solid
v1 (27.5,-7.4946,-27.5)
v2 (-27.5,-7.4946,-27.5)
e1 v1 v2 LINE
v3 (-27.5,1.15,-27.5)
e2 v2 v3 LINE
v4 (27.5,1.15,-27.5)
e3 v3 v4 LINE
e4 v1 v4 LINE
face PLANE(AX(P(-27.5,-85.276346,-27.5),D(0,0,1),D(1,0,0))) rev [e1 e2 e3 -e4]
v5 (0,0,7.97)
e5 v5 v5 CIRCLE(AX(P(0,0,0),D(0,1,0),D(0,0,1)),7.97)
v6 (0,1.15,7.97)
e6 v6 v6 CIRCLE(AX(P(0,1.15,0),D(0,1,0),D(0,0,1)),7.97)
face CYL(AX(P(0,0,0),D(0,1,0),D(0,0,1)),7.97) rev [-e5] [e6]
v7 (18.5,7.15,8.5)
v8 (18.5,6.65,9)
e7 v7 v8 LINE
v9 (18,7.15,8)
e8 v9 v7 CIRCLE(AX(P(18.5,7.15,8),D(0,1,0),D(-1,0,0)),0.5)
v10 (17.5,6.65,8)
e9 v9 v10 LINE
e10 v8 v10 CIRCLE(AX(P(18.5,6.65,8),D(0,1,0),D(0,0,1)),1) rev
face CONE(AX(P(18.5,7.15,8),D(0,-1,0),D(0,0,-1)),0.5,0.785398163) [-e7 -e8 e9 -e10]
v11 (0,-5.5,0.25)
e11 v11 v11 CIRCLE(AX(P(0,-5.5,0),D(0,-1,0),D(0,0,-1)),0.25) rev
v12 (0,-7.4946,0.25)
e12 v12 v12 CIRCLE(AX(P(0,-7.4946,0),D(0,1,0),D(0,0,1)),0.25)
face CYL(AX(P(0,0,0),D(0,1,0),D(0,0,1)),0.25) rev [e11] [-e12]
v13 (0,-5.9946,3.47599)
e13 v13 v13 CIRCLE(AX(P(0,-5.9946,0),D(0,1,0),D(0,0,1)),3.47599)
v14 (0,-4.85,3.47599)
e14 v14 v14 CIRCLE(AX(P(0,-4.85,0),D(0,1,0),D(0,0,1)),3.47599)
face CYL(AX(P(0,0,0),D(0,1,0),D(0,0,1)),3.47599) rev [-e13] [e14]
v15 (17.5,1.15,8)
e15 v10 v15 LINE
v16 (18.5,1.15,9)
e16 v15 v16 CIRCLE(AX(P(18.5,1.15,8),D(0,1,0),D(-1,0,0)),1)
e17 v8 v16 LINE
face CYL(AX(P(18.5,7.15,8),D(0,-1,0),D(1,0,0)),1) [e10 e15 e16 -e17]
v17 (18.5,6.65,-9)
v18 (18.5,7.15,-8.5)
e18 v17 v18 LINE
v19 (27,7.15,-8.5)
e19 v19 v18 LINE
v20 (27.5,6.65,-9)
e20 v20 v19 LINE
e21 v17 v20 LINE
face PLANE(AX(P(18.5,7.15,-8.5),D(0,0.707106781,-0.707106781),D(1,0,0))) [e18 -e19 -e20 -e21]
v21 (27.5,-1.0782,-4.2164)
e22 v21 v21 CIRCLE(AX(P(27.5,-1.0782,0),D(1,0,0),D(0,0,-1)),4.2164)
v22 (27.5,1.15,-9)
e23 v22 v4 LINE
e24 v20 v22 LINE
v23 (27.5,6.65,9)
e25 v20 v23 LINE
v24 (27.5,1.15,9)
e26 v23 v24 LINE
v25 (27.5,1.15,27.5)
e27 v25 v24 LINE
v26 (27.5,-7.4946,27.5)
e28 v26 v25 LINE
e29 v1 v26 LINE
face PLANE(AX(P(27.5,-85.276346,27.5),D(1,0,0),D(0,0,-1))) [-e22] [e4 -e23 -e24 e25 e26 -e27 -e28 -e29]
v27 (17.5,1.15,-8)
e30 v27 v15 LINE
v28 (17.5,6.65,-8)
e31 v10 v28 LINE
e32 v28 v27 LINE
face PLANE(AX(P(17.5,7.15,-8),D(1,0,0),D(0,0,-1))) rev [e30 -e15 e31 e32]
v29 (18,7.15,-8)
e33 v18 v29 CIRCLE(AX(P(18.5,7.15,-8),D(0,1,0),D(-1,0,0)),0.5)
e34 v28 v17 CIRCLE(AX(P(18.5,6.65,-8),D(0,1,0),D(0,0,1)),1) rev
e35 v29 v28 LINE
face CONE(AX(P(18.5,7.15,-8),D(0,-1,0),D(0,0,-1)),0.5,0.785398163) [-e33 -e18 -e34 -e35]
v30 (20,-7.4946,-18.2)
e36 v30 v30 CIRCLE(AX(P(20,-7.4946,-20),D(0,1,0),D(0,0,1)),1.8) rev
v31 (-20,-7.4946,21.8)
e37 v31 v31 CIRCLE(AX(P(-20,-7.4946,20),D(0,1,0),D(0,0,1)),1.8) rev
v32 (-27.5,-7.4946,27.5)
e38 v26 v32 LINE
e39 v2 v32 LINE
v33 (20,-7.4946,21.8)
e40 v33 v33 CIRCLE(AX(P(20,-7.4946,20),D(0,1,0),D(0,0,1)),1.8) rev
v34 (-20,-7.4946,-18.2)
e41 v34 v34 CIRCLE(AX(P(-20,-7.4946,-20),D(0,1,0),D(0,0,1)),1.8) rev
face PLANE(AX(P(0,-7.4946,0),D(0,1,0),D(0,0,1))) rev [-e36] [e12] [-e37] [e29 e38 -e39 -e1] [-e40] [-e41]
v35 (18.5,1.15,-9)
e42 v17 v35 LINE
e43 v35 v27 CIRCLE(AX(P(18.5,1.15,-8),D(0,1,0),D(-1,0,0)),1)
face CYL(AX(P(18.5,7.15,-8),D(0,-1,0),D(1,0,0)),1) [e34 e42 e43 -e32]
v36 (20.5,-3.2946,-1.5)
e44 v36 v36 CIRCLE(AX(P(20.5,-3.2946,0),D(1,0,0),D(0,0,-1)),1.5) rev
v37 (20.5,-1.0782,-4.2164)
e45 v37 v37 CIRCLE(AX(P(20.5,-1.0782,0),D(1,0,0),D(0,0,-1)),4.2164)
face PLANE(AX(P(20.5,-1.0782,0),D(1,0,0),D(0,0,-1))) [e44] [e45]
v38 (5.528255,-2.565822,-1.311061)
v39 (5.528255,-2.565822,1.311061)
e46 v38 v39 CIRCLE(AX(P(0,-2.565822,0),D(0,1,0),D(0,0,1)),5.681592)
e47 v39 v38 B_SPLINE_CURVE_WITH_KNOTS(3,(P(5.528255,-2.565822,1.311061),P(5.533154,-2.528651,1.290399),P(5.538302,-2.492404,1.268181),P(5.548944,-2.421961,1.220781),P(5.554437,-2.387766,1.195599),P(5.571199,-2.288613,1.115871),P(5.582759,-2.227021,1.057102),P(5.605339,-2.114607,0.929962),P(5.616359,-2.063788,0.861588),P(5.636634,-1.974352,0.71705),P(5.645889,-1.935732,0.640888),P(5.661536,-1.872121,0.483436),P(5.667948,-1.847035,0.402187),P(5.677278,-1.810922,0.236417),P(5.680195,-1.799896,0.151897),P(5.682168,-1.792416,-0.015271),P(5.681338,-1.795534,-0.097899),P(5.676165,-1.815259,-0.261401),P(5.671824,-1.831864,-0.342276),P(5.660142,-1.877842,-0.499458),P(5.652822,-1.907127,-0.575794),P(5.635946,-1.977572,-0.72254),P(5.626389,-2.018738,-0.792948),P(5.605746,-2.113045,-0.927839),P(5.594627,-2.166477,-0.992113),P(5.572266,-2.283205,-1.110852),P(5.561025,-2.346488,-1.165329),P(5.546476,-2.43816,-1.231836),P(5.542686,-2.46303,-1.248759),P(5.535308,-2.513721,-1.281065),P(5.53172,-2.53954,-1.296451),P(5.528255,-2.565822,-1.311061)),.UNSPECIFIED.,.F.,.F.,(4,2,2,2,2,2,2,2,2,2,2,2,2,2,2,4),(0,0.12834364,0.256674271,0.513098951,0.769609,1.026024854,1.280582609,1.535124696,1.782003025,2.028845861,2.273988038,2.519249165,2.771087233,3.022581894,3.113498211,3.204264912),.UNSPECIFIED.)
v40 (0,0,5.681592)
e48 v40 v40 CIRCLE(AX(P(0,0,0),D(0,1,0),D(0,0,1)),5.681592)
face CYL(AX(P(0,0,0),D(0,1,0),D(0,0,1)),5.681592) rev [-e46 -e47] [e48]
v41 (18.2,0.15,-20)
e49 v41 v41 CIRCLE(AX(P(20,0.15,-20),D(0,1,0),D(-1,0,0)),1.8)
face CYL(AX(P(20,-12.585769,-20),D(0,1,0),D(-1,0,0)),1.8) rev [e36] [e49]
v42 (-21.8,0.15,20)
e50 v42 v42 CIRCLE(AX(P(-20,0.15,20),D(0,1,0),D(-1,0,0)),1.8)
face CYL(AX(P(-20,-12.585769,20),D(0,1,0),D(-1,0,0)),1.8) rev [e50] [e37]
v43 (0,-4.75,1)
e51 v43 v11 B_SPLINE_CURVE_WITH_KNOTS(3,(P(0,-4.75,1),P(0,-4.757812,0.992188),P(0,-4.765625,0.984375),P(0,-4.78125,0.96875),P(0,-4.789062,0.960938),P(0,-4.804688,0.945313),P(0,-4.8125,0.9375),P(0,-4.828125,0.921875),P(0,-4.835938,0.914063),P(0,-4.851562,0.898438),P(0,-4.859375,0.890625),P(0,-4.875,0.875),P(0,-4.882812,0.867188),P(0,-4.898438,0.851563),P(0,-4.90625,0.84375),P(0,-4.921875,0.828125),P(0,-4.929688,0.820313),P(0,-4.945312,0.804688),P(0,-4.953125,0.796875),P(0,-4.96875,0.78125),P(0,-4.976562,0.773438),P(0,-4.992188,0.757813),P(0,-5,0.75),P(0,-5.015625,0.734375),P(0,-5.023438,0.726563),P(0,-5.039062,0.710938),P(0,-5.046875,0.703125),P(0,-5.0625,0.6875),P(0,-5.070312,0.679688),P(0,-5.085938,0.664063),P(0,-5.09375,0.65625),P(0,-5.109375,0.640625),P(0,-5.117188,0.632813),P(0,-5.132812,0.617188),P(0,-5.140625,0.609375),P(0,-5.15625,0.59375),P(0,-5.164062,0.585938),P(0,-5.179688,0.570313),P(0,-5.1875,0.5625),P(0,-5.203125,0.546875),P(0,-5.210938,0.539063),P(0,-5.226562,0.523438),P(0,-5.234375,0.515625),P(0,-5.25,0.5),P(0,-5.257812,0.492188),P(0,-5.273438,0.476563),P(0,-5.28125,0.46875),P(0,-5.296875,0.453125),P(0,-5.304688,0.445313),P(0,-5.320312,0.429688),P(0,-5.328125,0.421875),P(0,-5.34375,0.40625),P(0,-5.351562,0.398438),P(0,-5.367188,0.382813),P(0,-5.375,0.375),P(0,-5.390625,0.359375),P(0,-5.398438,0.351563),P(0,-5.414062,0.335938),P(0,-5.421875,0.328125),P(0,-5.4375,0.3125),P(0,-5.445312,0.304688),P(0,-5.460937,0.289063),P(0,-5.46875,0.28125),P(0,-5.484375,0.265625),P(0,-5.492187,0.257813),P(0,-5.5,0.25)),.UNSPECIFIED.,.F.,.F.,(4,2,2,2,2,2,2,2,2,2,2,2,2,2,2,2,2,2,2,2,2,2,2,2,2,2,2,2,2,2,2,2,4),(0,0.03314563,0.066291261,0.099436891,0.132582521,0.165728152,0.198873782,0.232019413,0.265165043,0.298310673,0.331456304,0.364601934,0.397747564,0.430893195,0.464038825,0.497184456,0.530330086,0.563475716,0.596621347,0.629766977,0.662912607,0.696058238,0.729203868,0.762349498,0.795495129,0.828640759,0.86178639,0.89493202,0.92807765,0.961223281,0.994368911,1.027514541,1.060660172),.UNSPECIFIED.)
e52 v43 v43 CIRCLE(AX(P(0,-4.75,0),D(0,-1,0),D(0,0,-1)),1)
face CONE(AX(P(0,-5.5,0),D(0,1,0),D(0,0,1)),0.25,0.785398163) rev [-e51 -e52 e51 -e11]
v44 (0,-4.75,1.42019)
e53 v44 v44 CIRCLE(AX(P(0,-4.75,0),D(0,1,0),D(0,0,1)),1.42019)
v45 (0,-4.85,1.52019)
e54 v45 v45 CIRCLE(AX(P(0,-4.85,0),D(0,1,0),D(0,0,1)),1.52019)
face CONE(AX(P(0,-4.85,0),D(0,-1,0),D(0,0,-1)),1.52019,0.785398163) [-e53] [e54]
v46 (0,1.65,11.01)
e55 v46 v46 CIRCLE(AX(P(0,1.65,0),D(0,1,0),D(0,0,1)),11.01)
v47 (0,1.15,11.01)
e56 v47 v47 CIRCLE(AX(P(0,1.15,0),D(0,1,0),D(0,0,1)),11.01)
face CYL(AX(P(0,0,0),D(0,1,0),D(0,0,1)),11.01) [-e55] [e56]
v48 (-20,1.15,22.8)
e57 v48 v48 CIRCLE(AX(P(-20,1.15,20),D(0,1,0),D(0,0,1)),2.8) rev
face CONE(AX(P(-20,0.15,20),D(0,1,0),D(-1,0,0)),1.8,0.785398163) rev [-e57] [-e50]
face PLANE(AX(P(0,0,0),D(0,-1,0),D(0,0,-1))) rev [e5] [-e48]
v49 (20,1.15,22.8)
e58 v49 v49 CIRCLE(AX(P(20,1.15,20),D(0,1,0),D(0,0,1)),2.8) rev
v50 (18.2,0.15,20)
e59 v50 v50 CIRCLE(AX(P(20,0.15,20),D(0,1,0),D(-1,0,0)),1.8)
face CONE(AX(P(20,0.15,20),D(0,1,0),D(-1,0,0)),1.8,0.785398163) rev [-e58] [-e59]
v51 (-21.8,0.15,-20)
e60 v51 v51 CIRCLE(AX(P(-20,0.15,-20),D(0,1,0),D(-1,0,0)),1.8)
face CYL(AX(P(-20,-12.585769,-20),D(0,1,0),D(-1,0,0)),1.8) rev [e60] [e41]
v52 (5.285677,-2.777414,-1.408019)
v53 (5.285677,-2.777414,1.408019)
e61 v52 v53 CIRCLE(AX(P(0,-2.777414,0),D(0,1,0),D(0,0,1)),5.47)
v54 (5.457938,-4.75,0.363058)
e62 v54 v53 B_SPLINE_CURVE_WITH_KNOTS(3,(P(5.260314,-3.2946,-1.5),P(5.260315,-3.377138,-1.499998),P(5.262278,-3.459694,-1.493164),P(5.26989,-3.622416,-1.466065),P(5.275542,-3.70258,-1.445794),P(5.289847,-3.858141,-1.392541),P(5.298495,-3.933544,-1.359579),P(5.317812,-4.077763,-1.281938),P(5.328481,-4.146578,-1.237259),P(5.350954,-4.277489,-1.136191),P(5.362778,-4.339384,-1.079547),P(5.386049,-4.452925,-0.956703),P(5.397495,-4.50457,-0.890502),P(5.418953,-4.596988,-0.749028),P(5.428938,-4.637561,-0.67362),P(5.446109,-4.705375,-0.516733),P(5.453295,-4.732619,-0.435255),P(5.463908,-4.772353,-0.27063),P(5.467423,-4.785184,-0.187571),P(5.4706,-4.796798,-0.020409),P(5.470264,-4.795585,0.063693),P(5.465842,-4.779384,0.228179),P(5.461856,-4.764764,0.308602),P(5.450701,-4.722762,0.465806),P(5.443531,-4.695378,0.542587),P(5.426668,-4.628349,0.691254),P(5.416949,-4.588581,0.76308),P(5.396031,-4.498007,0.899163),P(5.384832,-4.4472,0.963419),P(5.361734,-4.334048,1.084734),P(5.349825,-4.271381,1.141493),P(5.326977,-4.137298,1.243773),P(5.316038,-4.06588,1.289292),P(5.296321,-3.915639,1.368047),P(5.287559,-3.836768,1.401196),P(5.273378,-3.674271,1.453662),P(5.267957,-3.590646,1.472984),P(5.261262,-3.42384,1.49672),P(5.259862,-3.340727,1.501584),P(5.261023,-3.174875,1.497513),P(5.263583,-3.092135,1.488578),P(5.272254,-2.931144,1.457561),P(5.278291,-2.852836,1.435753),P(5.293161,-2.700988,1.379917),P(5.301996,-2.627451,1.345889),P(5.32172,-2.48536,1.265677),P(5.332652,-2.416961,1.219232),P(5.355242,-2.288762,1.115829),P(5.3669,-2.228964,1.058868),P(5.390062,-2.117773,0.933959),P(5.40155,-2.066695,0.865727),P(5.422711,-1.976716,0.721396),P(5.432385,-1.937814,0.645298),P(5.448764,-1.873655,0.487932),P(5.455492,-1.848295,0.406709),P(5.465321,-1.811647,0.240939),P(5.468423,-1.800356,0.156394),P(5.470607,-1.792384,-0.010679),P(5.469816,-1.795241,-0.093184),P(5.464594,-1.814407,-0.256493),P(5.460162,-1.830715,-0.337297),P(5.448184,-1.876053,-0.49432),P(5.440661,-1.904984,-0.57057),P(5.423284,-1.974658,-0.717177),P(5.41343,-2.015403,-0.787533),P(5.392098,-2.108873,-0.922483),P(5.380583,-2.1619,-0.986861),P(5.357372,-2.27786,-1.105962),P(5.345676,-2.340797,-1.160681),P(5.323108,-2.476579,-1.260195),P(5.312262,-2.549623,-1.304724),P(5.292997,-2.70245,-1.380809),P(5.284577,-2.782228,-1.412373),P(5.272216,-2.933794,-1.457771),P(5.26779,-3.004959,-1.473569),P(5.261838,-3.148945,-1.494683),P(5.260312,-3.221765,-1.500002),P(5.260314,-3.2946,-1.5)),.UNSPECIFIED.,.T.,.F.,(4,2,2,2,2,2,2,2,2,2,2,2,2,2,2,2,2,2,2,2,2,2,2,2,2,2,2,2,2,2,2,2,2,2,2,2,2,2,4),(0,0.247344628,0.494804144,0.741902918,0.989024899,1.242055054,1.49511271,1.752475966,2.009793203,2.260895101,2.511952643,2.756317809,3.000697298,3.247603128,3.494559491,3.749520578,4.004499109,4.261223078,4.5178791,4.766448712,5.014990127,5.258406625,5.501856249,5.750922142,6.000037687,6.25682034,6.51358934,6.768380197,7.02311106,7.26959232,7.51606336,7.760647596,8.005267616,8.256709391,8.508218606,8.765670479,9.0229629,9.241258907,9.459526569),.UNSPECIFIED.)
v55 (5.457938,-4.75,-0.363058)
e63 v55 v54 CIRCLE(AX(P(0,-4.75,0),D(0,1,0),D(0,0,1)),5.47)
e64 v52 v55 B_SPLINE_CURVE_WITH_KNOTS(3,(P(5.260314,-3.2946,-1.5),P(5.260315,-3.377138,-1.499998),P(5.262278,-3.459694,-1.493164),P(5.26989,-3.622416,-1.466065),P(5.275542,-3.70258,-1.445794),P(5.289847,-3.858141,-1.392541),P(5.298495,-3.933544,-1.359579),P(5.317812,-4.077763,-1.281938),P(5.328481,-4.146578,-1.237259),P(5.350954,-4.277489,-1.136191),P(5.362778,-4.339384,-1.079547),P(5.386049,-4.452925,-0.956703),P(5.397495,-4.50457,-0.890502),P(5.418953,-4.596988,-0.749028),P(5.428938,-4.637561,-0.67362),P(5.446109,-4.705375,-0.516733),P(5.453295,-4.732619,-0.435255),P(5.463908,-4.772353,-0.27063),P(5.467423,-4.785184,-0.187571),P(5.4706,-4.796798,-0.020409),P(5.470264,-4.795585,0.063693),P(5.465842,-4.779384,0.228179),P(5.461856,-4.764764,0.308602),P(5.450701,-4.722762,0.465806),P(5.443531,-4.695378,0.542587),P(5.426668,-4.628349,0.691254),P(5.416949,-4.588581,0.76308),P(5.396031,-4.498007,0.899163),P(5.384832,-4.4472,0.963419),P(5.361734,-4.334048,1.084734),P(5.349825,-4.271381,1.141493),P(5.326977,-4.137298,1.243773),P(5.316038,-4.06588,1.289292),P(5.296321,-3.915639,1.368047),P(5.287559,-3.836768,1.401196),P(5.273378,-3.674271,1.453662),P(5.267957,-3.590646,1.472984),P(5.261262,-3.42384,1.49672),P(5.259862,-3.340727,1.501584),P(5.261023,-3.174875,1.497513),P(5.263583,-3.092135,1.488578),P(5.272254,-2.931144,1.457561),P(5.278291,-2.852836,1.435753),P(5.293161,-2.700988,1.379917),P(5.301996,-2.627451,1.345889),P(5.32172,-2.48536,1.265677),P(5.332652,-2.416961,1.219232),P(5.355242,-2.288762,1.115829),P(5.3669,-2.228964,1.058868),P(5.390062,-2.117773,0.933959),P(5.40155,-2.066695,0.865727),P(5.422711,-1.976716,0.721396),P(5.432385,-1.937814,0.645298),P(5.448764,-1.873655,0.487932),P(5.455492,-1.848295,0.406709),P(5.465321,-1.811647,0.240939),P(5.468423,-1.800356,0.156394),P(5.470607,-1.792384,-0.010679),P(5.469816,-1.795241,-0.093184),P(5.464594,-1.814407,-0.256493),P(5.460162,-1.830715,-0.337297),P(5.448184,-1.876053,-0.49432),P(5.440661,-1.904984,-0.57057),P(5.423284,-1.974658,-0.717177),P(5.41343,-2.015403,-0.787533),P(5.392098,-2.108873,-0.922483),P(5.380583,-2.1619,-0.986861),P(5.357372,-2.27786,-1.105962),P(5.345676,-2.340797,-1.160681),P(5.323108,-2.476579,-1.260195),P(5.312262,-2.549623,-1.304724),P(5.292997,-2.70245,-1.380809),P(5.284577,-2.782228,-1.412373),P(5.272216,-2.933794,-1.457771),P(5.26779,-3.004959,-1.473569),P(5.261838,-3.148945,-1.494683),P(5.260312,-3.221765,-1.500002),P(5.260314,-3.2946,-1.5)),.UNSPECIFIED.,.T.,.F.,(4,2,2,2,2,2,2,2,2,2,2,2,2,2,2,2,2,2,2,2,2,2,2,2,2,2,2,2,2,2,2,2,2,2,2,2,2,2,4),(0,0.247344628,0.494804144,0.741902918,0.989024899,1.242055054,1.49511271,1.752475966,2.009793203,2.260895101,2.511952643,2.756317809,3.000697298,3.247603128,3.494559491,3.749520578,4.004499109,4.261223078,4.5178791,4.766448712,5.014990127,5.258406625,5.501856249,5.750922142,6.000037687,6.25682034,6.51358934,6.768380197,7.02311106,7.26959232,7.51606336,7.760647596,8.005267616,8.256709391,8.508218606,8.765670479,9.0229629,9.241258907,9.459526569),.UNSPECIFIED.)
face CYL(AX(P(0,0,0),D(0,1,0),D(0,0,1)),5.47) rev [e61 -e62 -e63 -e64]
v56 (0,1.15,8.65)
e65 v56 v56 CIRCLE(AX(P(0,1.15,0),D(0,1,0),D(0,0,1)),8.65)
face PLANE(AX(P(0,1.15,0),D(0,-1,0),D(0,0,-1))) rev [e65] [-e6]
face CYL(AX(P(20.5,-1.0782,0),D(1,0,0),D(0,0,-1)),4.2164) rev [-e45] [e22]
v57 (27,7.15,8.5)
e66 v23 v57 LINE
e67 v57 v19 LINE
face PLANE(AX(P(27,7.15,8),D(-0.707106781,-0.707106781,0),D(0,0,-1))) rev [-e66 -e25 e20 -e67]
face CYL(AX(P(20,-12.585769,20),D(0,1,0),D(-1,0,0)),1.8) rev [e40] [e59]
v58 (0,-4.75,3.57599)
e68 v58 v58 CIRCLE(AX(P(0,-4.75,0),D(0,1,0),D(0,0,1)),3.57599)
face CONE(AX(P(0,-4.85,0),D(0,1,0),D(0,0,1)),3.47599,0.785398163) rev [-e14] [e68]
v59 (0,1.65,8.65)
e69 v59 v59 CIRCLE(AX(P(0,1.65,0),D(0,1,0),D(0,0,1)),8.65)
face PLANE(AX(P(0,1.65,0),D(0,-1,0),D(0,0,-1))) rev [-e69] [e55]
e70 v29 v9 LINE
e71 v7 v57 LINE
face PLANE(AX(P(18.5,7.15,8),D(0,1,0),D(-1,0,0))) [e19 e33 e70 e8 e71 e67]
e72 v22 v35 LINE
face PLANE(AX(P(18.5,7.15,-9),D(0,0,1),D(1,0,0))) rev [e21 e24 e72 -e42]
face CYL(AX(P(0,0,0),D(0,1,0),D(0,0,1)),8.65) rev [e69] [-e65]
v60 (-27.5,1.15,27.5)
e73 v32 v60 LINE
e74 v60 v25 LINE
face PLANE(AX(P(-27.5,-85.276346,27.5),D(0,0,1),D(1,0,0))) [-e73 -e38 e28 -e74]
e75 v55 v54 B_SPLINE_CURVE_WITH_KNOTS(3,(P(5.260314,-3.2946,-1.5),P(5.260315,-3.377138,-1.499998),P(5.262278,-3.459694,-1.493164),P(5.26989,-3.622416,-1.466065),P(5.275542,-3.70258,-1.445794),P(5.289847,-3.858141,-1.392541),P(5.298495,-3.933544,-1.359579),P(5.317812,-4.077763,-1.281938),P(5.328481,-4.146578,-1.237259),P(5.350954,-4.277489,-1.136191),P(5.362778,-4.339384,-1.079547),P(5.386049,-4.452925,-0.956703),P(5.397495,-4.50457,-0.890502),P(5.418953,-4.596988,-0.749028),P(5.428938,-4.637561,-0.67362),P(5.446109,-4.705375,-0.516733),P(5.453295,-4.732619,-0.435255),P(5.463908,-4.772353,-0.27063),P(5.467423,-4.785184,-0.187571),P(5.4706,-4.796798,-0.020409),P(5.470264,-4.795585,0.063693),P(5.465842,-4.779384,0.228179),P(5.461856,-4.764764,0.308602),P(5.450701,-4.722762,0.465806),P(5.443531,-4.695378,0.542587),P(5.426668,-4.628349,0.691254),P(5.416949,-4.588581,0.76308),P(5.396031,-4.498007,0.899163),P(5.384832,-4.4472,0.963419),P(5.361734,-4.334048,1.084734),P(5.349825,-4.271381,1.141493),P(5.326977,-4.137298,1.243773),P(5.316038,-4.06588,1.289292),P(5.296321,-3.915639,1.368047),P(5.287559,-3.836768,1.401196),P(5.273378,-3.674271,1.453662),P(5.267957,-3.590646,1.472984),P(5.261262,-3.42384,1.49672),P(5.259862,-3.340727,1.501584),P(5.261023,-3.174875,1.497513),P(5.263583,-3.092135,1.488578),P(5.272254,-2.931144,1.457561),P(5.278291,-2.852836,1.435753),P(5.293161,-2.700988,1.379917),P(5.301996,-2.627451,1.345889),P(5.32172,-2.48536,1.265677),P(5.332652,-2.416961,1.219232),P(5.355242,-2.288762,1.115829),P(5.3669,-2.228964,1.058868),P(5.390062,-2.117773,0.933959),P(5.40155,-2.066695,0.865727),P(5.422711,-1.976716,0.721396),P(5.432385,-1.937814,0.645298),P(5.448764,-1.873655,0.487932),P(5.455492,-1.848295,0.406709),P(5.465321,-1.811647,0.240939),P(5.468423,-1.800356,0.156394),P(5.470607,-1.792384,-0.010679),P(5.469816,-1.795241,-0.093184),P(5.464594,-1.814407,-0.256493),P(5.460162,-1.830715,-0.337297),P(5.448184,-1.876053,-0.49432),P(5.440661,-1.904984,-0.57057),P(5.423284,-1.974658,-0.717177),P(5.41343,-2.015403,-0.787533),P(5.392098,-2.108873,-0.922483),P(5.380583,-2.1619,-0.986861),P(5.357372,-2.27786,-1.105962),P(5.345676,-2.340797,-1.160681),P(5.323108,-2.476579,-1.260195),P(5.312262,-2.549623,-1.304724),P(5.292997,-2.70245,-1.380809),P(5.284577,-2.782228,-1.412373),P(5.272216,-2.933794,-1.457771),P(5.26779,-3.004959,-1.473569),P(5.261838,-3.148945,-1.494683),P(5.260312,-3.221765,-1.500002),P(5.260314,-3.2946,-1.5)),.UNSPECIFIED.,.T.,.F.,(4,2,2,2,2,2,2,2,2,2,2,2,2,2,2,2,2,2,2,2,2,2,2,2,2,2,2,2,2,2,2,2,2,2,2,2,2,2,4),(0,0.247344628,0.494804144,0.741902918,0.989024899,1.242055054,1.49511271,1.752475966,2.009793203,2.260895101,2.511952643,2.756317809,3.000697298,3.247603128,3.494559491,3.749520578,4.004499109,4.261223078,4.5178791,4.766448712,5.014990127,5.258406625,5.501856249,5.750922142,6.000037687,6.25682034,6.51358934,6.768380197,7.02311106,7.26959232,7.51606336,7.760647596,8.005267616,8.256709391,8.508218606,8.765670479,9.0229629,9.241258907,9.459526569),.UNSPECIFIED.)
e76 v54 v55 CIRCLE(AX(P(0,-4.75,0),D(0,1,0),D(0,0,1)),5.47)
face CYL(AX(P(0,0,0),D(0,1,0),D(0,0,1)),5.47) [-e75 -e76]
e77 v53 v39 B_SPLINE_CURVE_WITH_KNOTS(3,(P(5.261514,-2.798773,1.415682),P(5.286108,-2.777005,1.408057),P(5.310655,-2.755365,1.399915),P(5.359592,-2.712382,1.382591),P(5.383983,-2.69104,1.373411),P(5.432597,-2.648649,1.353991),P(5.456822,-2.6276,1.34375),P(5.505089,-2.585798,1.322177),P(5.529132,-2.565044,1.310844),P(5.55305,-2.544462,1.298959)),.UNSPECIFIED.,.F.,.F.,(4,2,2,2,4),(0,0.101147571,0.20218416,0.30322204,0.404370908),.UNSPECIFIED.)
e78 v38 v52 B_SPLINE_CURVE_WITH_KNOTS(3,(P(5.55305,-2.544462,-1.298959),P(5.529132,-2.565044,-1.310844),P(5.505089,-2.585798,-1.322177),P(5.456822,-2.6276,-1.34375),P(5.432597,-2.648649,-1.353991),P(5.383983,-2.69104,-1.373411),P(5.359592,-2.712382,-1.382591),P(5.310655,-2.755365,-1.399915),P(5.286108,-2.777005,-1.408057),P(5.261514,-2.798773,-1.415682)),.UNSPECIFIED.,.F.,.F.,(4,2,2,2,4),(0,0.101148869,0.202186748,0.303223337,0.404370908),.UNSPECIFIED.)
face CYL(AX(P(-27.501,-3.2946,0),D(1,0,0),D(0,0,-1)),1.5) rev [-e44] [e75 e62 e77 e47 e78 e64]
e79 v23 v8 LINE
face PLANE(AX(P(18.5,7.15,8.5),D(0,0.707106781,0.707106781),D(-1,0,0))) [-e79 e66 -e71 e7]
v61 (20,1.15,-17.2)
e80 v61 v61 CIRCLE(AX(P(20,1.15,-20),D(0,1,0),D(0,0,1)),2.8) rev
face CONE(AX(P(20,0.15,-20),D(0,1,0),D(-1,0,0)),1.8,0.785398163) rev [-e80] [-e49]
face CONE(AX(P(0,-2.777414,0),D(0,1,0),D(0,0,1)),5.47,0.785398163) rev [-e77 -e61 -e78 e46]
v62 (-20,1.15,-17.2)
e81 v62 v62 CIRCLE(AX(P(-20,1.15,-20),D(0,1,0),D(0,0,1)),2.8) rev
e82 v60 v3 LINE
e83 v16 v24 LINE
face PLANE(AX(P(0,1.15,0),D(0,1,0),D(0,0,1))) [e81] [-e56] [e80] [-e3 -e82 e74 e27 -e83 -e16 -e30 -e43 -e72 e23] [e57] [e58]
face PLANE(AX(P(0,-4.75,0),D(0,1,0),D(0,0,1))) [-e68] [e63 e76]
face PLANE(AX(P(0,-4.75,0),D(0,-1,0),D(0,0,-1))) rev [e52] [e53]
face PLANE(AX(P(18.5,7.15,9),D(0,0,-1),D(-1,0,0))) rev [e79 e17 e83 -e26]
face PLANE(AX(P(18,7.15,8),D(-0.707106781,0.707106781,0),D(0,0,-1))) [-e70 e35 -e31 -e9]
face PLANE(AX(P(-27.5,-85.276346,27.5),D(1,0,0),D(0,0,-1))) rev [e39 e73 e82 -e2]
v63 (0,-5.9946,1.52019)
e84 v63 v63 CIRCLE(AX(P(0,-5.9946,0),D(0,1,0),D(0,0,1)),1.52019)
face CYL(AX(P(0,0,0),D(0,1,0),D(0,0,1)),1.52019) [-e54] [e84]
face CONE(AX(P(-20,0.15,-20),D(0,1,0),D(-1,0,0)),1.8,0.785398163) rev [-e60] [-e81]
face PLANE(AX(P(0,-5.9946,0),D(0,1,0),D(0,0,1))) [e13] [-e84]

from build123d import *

# Parameters (mm, degrees)
SKETCH2_W               = 55
SKETCH2_H               = 55
SKETCH2_R               = 20
BOSS_EXTRUDE1_DEPTH     = 8.6446
CUT_EXTRUDE1_REACH      = 63.947
CUT_EXTRUDE1_END_RADIUS = 5.47
SKETCH3_R               = 1.5
CUT_EXTRUDE2_REACH      = 41.84
SKETCH4_R               = 1.8
CHAMFER1_SIZE           = 1
BOSS_EXTRUDE2_DEPTH     = 6
SKETCH8_R               = 4.2164
CUT_EXTRUDE5_DEPTH      = 7
CHAMFER2_SIZE           = 0.5
CHAMFER3_SIZE           = 0.75


# Read off the part's stored shape, not the designer's step: Revolve2
with BuildPart() as part:
    # Revolve2 outline → Revolve2 (revolve)
    with BuildSketch(Plane.XY):
        Polygon((20, -7.4946), (20, 1.15), (11.01, 1.15), (11.01, 1.65), (8.65, 1.65), (8.65, 1.15), (7.97, 1.15), (7.97, 0), (5.681592205, 0), (5.681592205, -2.5658216), (5.47, -2.777413805), (5.47, -4.75), (3.57599, -4.75), (3.47599, -4.85), (3.47599, -5.9946), (1.52019, -5.9946), (1.52019, -4.85), (1.42019, -4.75), (0.25, -4.75), (0.25, -7.4946), align=None)
    revolve(axis=Axis((0, 0, 0), (0, 1, 0)))

    # Sketch2 → Boss-Extrude1 (add)
    with BuildSketch(Plane(origin=(0, 1.15, 0), x_dir=(1, 0, 0), z_dir=(0, 1, 0))):
        Rectangle(SKETCH2_W, SKETCH2_H)
        Circle(SKETCH2_R, mode=Mode.SUBTRACT)
    extrude(amount=-BOSS_EXTRUDE1_DEPTH)

    # Cut-Extrude1: up to this cylinder (the profile starts outside it)
    cut_extrude1_end = Plane(origin=(0, -3.2946, 0), z_dir=(0, 1, 0)) * Cylinder(CUT_EXTRUDE1_END_RADIUS, 139.834, mode=Mode.PRIVATE)
    # Sketch3 → Cut-Extrude1 (cut, up to the surface)
    with BuildSketch(Plane(origin=(27.5, 0, 0), x_dir=(0, 0, -1), z_dir=(1, 0, 0)), mode=Mode.PRIVATE) as cut_extrude1_sk1:
        with Locations((0, -3.2946)):
            Circle(SKETCH3_R)
    cut_extrude1_tool1 = extrude(cut_extrude1_sk1.sketch, amount=-CUT_EXTRUDE1_REACH, mode=Mode.PRIVATE) - cut_extrude1_end
    add(cut_extrude1_tool1.solids().sort_by_distance((27.5, -3.2946, 0))[0], mode=Mode.SUBTRACT)

    # Sketch4 → Cut-Extrude2 (cut, up to next)
    with BuildSketch(Plane(origin=(0, 1.15, 0), x_dir=(1, 0, 0), z_dir=(0, 1, 0)), mode=Mode.PRIVATE) as cut_extrude2_sk1:
        with Locations(Location((20, 20, 0), (0, 0, 180))):
            Circle(SKETCH4_R)
    cut_extrude2_tool1 = extrude(cut_extrude2_sk1.sketch, amount=-CUT_EXTRUDE2_REACH, mode=Mode.PRIVATE) & part.part
    # Sketch4 → Cut-Extrude2 (cut, up to next)
    with BuildSketch(Plane(origin=(0, 1.15, 0), x_dir=(1, 0, 0), z_dir=(0, 1, 0)), mode=Mode.PRIVATE) as cut_extrude2_sk2:
        with Locations(Location((20, -20, 0), (0, 0, 180))):
            Circle(SKETCH4_R)
    cut_extrude2_tool2 = extrude(cut_extrude2_sk2.sketch, amount=-CUT_EXTRUDE2_REACH, mode=Mode.PRIVATE) & part.part
    # Sketch4 → Cut-Extrude2 (cut, up to next)
    with BuildSketch(Plane(origin=(0, 1.15, 0), x_dir=(1, 0, 0), z_dir=(0, 1, 0)), mode=Mode.PRIVATE) as cut_extrude2_sk3:
        with Locations(Location((-20, -20, 0), (0, 0, 180))):
            Circle(SKETCH4_R)
    cut_extrude2_tool3 = extrude(cut_extrude2_sk3.sketch, amount=-CUT_EXTRUDE2_REACH, mode=Mode.PRIVATE) & part.part
    # Sketch4 → Cut-Extrude2 (cut, up to next)
    with BuildSketch(Plane(origin=(0, 1.15, 0), x_dir=(1, 0, 0), z_dir=(0, 1, 0)), mode=Mode.PRIVATE) as cut_extrude2_sk4:
        with Locations(Location((-20, 20, 0), (0, 0, 180))):
            Circle(SKETCH4_R)
    cut_extrude2_tool4 = extrude(cut_extrude2_sk4.sketch, amount=-CUT_EXTRUDE2_REACH, mode=Mode.PRIVATE) & part.part
    add(cut_extrude2_tool1.solids().sort_by_distance((20, 1.15, -20))[0], mode=Mode.SUBTRACT)
    add(cut_extrude2_tool2.solids().sort_by_distance((20, 1.15, 20))[0], mode=Mode.SUBTRACT)
    add(cut_extrude2_tool3.solids().sort_by_distance((-20, 1.15, 20))[0], mode=Mode.SUBTRACT)
    add(cut_extrude2_tool4.solids().sort_by_distance((-20, 1.15, -20))[0], mode=Mode.SUBTRACT)

    # Chamfer1
    chamfer1_edges = [part.edges().sort_by_distance(p)[0] for p in [
        (-18.2, 1.15, -20),
        (-18.2, 1.15, 20),
        (21.8, 1.15, 20),
        (21.8, 1.15, -20),
    ]]
    chamfer(chamfer1_edges, length=CHAMFER1_SIZE)

    # Sketch9 → Boss-Extrude2 (add)
    with BuildSketch(Plane(origin=(0, 1.15, 0), x_dir=(1, 0, 0), z_dir=(0, 1, 0))):
        with BuildLine():
            Line((18.5, 9), (27.5, 9))
            Line((27.5, 9), (27.5, -9))
            Line((27.5, -9), (18.5, -9))
            ThreePointArc((18.5, -9), (17.792893219, -8.707106781), (17.5, -8))
            Line((17.5, -8), (17.5, 8))
            ThreePointArc((17.5, 8), (17.792893219, 8.707106781), (18.5, 9))
        make_face()
    extrude(amount=BOSS_EXTRUDE2_DEPTH)

    # Sketch8 → Cut-Extrude5 (cut)
    with BuildSketch(Plane(origin=(27.5, 0, 0), x_dir=(0, 0, -1), z_dir=(1, 0, 0))):
        with Locations((0, -1.0782)):
            Circle(SKETCH8_R)
    extrude(amount=-CUT_EXTRUDE5_DEPTH, mode=Mode.SUBTRACT)

    # Chamfer2
    chamfer2_edges = [part.edges().sort_by_distance(p)[0] for p in [
        (27.5, 7.15, 0),
        (23, 7.15, -9),
        (17.792893219, 7.15, -8.707106781),
        (17.5, 7.15, 0),
        (17.792893219, 7.15, 8.707106781),
        (23, 7.15, 9),
    ]]
    chamfer(chamfer2_edges, length=CHAMFER2_SIZE)

    # Chamfer3
    chamfer3_edges = [part.edges().sort_by_distance(p)[0] for p in [
        (-0.25, -4.75, 0),
    ]]
    chamfer(chamfer3_edges, length=CHAMFER3_SIZE)


solid = part.part
